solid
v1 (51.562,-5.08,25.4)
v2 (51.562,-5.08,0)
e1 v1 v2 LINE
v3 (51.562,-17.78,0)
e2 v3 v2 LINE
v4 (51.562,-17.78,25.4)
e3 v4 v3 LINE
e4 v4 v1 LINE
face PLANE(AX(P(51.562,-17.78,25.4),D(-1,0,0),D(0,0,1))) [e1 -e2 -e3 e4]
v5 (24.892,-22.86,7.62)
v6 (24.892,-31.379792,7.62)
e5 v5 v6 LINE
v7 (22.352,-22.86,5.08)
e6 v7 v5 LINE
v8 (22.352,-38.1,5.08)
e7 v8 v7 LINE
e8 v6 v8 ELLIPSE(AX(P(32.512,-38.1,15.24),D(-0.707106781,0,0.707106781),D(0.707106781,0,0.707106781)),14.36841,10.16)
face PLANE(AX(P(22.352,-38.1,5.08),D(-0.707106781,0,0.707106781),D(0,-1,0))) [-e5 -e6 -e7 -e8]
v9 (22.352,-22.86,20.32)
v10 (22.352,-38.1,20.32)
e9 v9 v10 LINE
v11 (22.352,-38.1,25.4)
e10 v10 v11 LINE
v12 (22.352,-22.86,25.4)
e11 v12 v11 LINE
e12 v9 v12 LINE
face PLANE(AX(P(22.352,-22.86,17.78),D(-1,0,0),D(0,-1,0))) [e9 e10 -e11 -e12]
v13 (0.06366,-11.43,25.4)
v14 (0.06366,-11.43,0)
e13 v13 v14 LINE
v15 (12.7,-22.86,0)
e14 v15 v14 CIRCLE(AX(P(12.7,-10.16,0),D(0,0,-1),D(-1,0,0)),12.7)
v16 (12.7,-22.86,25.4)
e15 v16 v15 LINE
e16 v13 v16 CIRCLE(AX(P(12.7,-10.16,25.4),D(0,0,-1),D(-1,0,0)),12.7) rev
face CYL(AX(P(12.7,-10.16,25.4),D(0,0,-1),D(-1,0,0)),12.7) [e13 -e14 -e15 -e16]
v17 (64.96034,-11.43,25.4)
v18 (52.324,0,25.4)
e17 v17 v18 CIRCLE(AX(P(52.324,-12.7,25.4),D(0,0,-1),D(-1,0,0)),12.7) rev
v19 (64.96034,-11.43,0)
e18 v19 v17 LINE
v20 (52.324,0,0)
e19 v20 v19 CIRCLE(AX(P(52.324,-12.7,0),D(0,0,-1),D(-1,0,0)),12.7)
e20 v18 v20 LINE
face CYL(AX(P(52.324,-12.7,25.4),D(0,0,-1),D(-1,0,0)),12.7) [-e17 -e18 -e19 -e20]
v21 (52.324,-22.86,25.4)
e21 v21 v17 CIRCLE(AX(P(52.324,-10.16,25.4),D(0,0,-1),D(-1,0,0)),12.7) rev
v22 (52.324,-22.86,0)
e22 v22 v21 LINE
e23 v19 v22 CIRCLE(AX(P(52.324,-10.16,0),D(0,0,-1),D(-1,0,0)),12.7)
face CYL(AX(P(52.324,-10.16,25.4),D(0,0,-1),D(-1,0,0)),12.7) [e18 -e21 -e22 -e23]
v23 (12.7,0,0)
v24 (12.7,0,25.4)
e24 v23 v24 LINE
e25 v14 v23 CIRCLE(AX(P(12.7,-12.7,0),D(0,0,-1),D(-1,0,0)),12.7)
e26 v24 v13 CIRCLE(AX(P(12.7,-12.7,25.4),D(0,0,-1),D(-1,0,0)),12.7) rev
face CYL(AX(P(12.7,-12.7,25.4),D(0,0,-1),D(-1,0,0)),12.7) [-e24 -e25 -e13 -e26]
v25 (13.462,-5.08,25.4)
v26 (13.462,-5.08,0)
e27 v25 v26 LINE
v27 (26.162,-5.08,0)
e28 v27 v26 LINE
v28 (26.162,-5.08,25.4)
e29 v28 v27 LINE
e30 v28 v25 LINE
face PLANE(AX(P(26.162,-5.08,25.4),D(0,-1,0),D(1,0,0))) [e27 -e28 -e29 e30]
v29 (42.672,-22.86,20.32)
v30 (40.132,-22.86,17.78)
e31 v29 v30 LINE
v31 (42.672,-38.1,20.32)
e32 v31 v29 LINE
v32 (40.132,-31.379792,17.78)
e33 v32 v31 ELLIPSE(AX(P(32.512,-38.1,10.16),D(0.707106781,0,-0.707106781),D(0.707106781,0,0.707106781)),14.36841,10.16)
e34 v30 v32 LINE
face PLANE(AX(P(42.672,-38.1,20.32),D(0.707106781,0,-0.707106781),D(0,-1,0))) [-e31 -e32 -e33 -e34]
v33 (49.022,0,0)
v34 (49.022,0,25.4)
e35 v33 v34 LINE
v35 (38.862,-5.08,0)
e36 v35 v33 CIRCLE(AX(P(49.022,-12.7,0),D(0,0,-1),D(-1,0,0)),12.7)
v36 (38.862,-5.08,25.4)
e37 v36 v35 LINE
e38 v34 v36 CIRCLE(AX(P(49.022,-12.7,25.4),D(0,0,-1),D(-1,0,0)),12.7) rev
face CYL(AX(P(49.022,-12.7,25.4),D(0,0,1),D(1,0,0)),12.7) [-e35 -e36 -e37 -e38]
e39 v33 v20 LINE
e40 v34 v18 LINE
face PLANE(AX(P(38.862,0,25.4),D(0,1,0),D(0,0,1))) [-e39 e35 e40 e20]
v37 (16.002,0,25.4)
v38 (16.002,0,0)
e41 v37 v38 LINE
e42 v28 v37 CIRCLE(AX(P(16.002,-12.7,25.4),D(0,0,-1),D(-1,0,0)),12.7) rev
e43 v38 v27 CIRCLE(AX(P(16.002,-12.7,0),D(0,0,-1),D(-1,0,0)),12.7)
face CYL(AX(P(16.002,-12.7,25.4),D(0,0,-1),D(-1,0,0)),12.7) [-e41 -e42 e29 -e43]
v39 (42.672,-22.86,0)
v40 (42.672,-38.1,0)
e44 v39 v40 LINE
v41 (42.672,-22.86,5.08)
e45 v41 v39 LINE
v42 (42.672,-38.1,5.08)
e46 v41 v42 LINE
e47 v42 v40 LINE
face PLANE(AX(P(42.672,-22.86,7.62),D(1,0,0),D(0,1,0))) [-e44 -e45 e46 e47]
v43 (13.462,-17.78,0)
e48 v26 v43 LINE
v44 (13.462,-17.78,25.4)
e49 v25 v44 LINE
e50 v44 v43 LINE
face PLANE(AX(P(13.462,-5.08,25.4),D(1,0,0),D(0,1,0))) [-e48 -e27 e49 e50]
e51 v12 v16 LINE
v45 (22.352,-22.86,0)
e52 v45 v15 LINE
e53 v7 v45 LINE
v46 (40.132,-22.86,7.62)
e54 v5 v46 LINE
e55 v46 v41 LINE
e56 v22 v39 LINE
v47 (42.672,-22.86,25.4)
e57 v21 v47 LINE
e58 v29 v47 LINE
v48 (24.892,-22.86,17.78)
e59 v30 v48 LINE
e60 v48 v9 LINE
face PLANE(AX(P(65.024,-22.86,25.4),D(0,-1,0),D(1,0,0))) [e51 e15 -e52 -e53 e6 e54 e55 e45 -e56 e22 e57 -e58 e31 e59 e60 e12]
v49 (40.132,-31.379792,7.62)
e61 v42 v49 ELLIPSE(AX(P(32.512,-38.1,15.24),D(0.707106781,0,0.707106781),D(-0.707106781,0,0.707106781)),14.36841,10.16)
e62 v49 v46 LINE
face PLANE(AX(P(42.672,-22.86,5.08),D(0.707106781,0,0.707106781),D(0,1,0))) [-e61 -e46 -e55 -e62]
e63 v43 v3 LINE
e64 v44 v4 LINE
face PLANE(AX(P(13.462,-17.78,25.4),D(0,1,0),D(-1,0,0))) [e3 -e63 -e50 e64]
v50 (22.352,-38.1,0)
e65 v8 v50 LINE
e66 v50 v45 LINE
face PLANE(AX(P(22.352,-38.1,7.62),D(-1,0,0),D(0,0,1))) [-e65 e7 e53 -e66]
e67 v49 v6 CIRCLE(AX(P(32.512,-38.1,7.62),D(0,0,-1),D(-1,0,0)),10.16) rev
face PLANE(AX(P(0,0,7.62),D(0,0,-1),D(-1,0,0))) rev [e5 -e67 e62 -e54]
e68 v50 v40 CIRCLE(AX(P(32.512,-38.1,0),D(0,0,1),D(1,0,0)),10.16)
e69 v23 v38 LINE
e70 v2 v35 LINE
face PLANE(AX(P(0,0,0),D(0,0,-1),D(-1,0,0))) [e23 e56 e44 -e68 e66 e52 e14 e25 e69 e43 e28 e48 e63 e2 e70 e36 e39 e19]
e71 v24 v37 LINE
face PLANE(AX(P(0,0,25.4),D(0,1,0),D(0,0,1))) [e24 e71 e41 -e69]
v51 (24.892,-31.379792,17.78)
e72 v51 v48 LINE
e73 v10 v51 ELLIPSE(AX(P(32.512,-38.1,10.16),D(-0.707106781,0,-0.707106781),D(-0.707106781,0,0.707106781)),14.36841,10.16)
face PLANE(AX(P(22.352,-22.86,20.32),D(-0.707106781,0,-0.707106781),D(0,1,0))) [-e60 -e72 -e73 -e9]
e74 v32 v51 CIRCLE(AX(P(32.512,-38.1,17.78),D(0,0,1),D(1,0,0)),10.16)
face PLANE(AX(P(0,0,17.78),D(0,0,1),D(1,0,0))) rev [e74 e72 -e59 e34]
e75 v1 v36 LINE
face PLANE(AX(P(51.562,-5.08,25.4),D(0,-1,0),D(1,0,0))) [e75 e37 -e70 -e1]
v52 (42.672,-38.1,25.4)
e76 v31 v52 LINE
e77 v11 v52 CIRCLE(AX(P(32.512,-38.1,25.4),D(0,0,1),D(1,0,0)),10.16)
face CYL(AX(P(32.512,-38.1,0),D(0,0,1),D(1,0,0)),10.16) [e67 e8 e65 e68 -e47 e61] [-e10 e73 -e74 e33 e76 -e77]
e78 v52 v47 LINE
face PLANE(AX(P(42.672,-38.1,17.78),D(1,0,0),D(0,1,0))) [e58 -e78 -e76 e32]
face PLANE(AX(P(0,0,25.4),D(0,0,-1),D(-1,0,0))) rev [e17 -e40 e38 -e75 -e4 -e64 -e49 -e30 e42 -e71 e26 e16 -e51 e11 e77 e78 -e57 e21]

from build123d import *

# Parameters (mm, degrees)
BOSS_EXTRUDE2_DEPTH = 25.4
BOSS_EXTRUDE3_DEPTH = 7.62
SKETCH6_R           = 10.16
BOSS_EXTRUDE5_DEPTH = 25.4
FILLET4_R           = 12.7
CHAMFER3_SIZE       = 2.54
SKETCH7_W           = 20.32
SKETCH7_H           = 15.24
BOSS_EXTRUDE6_DEPTH = 7.62
CHAMFER4_SIZE       = 2.54


with BuildPart() as part:
    # Sketch2 → Boss-Extrude2 (new body)
    with BuildSketch(Plane.XY):
        Polygon((0, 0), (26.162, 0), (26.162, -5.08), (13.462, -5.08), (13.462, -17.78), (51.562, -17.78), (51.562, -5.08), (38.862, -5.08), (38.862, 0), (65.024, 0), (65.024, -22.86), (0, -22.86), align=None)
    extrude(amount=BOSS_EXTRUDE2_DEPTH)

    # Sketch4 → Boss-Extrude3 (add)
    with BuildSketch(Plane.XY.offset(25.4)):
        Polygon((32.512, -22.86), (22.352, -22.86), (22.352, -38.1), (42.672, -38.1), (42.672, -22.86), align=None)
    extrude(amount=-BOSS_EXTRUDE3_DEPTH)

    # Sketch6 → Boss-Extrude5 (add)
    with BuildSketch(Plane.XY.offset(25.4)):
        with Locations((32.512, -38.1)):
            Circle(SKETCH6_R)
    extrude(amount=-BOSS_EXTRUDE5_DEPTH)

    # Fillet4
    # the kernel refuses this fillet: 12.7 mm, written as the material it takes off along each edge
    with BuildSketch(Plane(origin=(65.024, -22.86, -31.75), x_dir=(-1, 0, 0), z_dir=(0, 0, 1)), Plane(origin=(0, -22.86, -31.75), x_dir=(0, 1, 0), z_dir=(0, 0, 1)), Plane(origin=(0, 0, -31.75), x_dir=(1, 0, 0), z_dir=(0, 0, 1))) as fillet4_piece_1:
        with BuildLine():
            CenterArc((FILLET4_R, -FILLET4_R), FILLET4_R, 90, 90)
            Line((0, -FILLET4_R), (-FILLET4_R * 0.02, -FILLET4_R))
            Line((-FILLET4_R * 0.02, -FILLET4_R), (-FILLET4_R * 0.02, FILLET4_R * 0.02))
            Line((-FILLET4_R * 0.02, FILLET4_R * 0.02), (FILLET4_R, FILLET4_R * 0.02))
            Line((FILLET4_R, FILLET4_R * 0.02), (FILLET4_R, 0))
        make_face()
    extrude(amount=88.9, mode=Mode.SUBTRACT)
    with BuildSketch(Plane(origin=(26.162, 0, -25.4), x_dir=(-1, 0, 0), z_dir=(0, 0, 1))) as fillet4_piece_2:
        with BuildLine():
            CenterArc((10.16, 12.7), FILLET4_R, 216.869897646, 53.130102354)
            Line((0, 5.08), (-0.2032, 4.9276))
            ThreePointArc((-0.2032, 4.9276), (-0.254, 2.54), (-0.254, 0))
            Line((-0.254, 0), (0, -0.254))
            Line((0, -0.254), (10.16, -0.254))
            Line((10.16, -0.254), (10.16, 0))
        make_face()
    extrude(amount=76.2, mode=Mode.SUBTRACT)
    with BuildSketch(Plane(origin=(38.862, 0, -25.4), x_dir=(0, -1, 0), z_dir=(0, 0, 1))) as fillet4_piece_3:
        with BuildLine():
            CenterArc((12.7, 10.16), FILLET4_R, 180, 53.130102354)
            Line((0, 10.16), (-0.254, 10.16))
            Line((-0.254, 10.16), (-0.254, 0))
            Line((-0.254, 0), (0, -0.254))
            ThreePointArc((0, -0.254), (2.54, -0.254), (4.9276, -0.2032))
            Line((4.9276, -0.2032), (5.08, 0))
        make_face()
    extrude(amount=76.2, mode=Mode.SUBTRACT)
    with BuildSketch(Plane(origin=(65.024, 0, -31.75), x_dir=(-1, 0, 0), z_dir=(0, 0, 1))) as fillet4_piece_4:
        with BuildLine():
            CenterArc((FILLET4_R, FILLET4_R), FILLET4_R, 180, 90)
            Line((0, FILLET4_R), (-FILLET4_R * 0.02, FILLET4_R))
            Line((-FILLET4_R * 0.02, FILLET4_R), (-FILLET4_R * 0.02, -FILLET4_R * 0.02))
            Line((-FILLET4_R * 0.02, -FILLET4_R * 0.02), (FILLET4_R, -FILLET4_R * 0.02))
            Line((FILLET4_R, -FILLET4_R * 0.02), (FILLET4_R, 0))
        make_face()
    extrude(amount=88.9, mode=Mode.SUBTRACT)

    # Chamfer3
    # the kernel refuses this chamfer: 2.54 mm, written as the material it takes off along each edge
    with BuildSketch(Plane(origin=(42.672, -44.632074789, 17.78), x_dir=(0.027495876610587302, 0, 0.9996219169112966), z_dir=(0, 1, 0))) as chamfer3_piece_1_section:
        Polygon((CHAMFER3_SIZE * 0.999621916911, -CHAMFER3_SIZE * 0.0274958766106), (-CHAMFER3_SIZE * 0.0274958766106, -CHAMFER3_SIZE * 0.999621916911), (0, 0), align=None)
    chamfer3_piece_1 = extrude(amount=21.772074789, mode=Mode.PRIVATE)
    chamfer3_piece_1 = chamfer3_piece_1 - Plane(origin=(32.512, -38.1, 18.664342035), x_dir=(1, 0, 0), z_dir=(0, 0, 1)) * Cylinder(10.16, 54, mode=Mode.PRIVATE)
    add(chamfer3_piece_1, mode=Mode.SUBTRACT)
    with BuildSketch(Plane(origin=(22.352, -22.86, 17.78), x_dir=(-0.02749587661058595, 0, 0.9996219169112968), z_dir=(0, -1, 0))) as chamfer3_piece_2_section:
        Polygon((CHAMFER3_SIZE * 0.999621916911, -CHAMFER3_SIZE * 0.0274958766106), (-CHAMFER3_SIZE * 0.0274958766106, -CHAMFER3_SIZE * 0.999621916911), (0, 0), align=None)
    chamfer3_piece_2 = extrude(amount=21.772074789, mode=Mode.PRIVATE)
    chamfer3_piece_2 = chamfer3_piece_2 - Plane(origin=(32.512, -38.1, 18.664342036), x_dir=(1, 0, 0), z_dir=(0, 0, 1)) * Cylinder(10.16, 54, mode=Mode.PRIVATE)
    add(chamfer3_piece_2, mode=Mode.SUBTRACT)

    # Sketch7 → Boss-Extrude6 (add)
    with BuildSketch(Plane(origin=(0, 0, 0), x_dir=(-1, 0, 0), z_dir=(0, 0, -1))):
        with Locations((-32.512, -30.48)):
            Rectangle(SKETCH7_W, SKETCH7_H)
    extrude(amount=-BOSS_EXTRUDE6_DEPTH)

    # Chamfer4
    # the kernel refuses this chamfer: 2.54 mm, written as the material it takes off along each edge
    with BuildSketch(Plane(origin=(22.352, -44.632074789, 7.62), x_dir=(0.9996219169112966, 0, 0.027495876610586282), z_dir=(0, 1, 0))) as chamfer4_piece_1_section:
        Polygon((CHAMFER4_SIZE * 0.999621916911, CHAMFER4_SIZE * 0.0274958766106), (-CHAMFER4_SIZE * 0.0274958766106, CHAMFER4_SIZE * 0.999621916911), (0, 0), align=None)
    chamfer4_piece_1 = extrude(amount=21.772074789, mode=Mode.PRIVATE)
    chamfer4_piece_1 = chamfer4_piece_1 - Plane(origin=(32.512, -38.1, 6.735657964), x_dir=(1, 0, 0), z_dir=(0, 0, 1)) * Cylinder(10.16, 54, mode=Mode.PRIVATE)
    add(chamfer4_piece_1, mode=Mode.SUBTRACT)
    with BuildSketch(Plane(origin=(42.672, -22.86, 7.62), x_dir=(0.027495876610587288, 0, -0.9996219169112968), z_dir=(0, -1, 0))) as chamfer4_piece_2_section:
        Polygon((CHAMFER4_SIZE * 0.999621916911, -CHAMFER4_SIZE * 0.0274958766106), (-CHAMFER4_SIZE * 0.0274958766106, -CHAMFER4_SIZE * 0.999621916911), (0, 0), align=None)
    chamfer4_piece_2 = extrude(amount=21.772074789, mode=Mode.PRIVATE)
    chamfer4_piece_2 = chamfer4_piece_2 - Plane(origin=(32.512, -38.1, 6.735657965), x_dir=(1, 0, 0), z_dir=(0, 0, 1)) * Cylinder(10.16, 54, mode=Mode.PRIVATE)
    add(chamfer4_piece_2, mode=Mode.SUBTRACT)


solid = part.part
